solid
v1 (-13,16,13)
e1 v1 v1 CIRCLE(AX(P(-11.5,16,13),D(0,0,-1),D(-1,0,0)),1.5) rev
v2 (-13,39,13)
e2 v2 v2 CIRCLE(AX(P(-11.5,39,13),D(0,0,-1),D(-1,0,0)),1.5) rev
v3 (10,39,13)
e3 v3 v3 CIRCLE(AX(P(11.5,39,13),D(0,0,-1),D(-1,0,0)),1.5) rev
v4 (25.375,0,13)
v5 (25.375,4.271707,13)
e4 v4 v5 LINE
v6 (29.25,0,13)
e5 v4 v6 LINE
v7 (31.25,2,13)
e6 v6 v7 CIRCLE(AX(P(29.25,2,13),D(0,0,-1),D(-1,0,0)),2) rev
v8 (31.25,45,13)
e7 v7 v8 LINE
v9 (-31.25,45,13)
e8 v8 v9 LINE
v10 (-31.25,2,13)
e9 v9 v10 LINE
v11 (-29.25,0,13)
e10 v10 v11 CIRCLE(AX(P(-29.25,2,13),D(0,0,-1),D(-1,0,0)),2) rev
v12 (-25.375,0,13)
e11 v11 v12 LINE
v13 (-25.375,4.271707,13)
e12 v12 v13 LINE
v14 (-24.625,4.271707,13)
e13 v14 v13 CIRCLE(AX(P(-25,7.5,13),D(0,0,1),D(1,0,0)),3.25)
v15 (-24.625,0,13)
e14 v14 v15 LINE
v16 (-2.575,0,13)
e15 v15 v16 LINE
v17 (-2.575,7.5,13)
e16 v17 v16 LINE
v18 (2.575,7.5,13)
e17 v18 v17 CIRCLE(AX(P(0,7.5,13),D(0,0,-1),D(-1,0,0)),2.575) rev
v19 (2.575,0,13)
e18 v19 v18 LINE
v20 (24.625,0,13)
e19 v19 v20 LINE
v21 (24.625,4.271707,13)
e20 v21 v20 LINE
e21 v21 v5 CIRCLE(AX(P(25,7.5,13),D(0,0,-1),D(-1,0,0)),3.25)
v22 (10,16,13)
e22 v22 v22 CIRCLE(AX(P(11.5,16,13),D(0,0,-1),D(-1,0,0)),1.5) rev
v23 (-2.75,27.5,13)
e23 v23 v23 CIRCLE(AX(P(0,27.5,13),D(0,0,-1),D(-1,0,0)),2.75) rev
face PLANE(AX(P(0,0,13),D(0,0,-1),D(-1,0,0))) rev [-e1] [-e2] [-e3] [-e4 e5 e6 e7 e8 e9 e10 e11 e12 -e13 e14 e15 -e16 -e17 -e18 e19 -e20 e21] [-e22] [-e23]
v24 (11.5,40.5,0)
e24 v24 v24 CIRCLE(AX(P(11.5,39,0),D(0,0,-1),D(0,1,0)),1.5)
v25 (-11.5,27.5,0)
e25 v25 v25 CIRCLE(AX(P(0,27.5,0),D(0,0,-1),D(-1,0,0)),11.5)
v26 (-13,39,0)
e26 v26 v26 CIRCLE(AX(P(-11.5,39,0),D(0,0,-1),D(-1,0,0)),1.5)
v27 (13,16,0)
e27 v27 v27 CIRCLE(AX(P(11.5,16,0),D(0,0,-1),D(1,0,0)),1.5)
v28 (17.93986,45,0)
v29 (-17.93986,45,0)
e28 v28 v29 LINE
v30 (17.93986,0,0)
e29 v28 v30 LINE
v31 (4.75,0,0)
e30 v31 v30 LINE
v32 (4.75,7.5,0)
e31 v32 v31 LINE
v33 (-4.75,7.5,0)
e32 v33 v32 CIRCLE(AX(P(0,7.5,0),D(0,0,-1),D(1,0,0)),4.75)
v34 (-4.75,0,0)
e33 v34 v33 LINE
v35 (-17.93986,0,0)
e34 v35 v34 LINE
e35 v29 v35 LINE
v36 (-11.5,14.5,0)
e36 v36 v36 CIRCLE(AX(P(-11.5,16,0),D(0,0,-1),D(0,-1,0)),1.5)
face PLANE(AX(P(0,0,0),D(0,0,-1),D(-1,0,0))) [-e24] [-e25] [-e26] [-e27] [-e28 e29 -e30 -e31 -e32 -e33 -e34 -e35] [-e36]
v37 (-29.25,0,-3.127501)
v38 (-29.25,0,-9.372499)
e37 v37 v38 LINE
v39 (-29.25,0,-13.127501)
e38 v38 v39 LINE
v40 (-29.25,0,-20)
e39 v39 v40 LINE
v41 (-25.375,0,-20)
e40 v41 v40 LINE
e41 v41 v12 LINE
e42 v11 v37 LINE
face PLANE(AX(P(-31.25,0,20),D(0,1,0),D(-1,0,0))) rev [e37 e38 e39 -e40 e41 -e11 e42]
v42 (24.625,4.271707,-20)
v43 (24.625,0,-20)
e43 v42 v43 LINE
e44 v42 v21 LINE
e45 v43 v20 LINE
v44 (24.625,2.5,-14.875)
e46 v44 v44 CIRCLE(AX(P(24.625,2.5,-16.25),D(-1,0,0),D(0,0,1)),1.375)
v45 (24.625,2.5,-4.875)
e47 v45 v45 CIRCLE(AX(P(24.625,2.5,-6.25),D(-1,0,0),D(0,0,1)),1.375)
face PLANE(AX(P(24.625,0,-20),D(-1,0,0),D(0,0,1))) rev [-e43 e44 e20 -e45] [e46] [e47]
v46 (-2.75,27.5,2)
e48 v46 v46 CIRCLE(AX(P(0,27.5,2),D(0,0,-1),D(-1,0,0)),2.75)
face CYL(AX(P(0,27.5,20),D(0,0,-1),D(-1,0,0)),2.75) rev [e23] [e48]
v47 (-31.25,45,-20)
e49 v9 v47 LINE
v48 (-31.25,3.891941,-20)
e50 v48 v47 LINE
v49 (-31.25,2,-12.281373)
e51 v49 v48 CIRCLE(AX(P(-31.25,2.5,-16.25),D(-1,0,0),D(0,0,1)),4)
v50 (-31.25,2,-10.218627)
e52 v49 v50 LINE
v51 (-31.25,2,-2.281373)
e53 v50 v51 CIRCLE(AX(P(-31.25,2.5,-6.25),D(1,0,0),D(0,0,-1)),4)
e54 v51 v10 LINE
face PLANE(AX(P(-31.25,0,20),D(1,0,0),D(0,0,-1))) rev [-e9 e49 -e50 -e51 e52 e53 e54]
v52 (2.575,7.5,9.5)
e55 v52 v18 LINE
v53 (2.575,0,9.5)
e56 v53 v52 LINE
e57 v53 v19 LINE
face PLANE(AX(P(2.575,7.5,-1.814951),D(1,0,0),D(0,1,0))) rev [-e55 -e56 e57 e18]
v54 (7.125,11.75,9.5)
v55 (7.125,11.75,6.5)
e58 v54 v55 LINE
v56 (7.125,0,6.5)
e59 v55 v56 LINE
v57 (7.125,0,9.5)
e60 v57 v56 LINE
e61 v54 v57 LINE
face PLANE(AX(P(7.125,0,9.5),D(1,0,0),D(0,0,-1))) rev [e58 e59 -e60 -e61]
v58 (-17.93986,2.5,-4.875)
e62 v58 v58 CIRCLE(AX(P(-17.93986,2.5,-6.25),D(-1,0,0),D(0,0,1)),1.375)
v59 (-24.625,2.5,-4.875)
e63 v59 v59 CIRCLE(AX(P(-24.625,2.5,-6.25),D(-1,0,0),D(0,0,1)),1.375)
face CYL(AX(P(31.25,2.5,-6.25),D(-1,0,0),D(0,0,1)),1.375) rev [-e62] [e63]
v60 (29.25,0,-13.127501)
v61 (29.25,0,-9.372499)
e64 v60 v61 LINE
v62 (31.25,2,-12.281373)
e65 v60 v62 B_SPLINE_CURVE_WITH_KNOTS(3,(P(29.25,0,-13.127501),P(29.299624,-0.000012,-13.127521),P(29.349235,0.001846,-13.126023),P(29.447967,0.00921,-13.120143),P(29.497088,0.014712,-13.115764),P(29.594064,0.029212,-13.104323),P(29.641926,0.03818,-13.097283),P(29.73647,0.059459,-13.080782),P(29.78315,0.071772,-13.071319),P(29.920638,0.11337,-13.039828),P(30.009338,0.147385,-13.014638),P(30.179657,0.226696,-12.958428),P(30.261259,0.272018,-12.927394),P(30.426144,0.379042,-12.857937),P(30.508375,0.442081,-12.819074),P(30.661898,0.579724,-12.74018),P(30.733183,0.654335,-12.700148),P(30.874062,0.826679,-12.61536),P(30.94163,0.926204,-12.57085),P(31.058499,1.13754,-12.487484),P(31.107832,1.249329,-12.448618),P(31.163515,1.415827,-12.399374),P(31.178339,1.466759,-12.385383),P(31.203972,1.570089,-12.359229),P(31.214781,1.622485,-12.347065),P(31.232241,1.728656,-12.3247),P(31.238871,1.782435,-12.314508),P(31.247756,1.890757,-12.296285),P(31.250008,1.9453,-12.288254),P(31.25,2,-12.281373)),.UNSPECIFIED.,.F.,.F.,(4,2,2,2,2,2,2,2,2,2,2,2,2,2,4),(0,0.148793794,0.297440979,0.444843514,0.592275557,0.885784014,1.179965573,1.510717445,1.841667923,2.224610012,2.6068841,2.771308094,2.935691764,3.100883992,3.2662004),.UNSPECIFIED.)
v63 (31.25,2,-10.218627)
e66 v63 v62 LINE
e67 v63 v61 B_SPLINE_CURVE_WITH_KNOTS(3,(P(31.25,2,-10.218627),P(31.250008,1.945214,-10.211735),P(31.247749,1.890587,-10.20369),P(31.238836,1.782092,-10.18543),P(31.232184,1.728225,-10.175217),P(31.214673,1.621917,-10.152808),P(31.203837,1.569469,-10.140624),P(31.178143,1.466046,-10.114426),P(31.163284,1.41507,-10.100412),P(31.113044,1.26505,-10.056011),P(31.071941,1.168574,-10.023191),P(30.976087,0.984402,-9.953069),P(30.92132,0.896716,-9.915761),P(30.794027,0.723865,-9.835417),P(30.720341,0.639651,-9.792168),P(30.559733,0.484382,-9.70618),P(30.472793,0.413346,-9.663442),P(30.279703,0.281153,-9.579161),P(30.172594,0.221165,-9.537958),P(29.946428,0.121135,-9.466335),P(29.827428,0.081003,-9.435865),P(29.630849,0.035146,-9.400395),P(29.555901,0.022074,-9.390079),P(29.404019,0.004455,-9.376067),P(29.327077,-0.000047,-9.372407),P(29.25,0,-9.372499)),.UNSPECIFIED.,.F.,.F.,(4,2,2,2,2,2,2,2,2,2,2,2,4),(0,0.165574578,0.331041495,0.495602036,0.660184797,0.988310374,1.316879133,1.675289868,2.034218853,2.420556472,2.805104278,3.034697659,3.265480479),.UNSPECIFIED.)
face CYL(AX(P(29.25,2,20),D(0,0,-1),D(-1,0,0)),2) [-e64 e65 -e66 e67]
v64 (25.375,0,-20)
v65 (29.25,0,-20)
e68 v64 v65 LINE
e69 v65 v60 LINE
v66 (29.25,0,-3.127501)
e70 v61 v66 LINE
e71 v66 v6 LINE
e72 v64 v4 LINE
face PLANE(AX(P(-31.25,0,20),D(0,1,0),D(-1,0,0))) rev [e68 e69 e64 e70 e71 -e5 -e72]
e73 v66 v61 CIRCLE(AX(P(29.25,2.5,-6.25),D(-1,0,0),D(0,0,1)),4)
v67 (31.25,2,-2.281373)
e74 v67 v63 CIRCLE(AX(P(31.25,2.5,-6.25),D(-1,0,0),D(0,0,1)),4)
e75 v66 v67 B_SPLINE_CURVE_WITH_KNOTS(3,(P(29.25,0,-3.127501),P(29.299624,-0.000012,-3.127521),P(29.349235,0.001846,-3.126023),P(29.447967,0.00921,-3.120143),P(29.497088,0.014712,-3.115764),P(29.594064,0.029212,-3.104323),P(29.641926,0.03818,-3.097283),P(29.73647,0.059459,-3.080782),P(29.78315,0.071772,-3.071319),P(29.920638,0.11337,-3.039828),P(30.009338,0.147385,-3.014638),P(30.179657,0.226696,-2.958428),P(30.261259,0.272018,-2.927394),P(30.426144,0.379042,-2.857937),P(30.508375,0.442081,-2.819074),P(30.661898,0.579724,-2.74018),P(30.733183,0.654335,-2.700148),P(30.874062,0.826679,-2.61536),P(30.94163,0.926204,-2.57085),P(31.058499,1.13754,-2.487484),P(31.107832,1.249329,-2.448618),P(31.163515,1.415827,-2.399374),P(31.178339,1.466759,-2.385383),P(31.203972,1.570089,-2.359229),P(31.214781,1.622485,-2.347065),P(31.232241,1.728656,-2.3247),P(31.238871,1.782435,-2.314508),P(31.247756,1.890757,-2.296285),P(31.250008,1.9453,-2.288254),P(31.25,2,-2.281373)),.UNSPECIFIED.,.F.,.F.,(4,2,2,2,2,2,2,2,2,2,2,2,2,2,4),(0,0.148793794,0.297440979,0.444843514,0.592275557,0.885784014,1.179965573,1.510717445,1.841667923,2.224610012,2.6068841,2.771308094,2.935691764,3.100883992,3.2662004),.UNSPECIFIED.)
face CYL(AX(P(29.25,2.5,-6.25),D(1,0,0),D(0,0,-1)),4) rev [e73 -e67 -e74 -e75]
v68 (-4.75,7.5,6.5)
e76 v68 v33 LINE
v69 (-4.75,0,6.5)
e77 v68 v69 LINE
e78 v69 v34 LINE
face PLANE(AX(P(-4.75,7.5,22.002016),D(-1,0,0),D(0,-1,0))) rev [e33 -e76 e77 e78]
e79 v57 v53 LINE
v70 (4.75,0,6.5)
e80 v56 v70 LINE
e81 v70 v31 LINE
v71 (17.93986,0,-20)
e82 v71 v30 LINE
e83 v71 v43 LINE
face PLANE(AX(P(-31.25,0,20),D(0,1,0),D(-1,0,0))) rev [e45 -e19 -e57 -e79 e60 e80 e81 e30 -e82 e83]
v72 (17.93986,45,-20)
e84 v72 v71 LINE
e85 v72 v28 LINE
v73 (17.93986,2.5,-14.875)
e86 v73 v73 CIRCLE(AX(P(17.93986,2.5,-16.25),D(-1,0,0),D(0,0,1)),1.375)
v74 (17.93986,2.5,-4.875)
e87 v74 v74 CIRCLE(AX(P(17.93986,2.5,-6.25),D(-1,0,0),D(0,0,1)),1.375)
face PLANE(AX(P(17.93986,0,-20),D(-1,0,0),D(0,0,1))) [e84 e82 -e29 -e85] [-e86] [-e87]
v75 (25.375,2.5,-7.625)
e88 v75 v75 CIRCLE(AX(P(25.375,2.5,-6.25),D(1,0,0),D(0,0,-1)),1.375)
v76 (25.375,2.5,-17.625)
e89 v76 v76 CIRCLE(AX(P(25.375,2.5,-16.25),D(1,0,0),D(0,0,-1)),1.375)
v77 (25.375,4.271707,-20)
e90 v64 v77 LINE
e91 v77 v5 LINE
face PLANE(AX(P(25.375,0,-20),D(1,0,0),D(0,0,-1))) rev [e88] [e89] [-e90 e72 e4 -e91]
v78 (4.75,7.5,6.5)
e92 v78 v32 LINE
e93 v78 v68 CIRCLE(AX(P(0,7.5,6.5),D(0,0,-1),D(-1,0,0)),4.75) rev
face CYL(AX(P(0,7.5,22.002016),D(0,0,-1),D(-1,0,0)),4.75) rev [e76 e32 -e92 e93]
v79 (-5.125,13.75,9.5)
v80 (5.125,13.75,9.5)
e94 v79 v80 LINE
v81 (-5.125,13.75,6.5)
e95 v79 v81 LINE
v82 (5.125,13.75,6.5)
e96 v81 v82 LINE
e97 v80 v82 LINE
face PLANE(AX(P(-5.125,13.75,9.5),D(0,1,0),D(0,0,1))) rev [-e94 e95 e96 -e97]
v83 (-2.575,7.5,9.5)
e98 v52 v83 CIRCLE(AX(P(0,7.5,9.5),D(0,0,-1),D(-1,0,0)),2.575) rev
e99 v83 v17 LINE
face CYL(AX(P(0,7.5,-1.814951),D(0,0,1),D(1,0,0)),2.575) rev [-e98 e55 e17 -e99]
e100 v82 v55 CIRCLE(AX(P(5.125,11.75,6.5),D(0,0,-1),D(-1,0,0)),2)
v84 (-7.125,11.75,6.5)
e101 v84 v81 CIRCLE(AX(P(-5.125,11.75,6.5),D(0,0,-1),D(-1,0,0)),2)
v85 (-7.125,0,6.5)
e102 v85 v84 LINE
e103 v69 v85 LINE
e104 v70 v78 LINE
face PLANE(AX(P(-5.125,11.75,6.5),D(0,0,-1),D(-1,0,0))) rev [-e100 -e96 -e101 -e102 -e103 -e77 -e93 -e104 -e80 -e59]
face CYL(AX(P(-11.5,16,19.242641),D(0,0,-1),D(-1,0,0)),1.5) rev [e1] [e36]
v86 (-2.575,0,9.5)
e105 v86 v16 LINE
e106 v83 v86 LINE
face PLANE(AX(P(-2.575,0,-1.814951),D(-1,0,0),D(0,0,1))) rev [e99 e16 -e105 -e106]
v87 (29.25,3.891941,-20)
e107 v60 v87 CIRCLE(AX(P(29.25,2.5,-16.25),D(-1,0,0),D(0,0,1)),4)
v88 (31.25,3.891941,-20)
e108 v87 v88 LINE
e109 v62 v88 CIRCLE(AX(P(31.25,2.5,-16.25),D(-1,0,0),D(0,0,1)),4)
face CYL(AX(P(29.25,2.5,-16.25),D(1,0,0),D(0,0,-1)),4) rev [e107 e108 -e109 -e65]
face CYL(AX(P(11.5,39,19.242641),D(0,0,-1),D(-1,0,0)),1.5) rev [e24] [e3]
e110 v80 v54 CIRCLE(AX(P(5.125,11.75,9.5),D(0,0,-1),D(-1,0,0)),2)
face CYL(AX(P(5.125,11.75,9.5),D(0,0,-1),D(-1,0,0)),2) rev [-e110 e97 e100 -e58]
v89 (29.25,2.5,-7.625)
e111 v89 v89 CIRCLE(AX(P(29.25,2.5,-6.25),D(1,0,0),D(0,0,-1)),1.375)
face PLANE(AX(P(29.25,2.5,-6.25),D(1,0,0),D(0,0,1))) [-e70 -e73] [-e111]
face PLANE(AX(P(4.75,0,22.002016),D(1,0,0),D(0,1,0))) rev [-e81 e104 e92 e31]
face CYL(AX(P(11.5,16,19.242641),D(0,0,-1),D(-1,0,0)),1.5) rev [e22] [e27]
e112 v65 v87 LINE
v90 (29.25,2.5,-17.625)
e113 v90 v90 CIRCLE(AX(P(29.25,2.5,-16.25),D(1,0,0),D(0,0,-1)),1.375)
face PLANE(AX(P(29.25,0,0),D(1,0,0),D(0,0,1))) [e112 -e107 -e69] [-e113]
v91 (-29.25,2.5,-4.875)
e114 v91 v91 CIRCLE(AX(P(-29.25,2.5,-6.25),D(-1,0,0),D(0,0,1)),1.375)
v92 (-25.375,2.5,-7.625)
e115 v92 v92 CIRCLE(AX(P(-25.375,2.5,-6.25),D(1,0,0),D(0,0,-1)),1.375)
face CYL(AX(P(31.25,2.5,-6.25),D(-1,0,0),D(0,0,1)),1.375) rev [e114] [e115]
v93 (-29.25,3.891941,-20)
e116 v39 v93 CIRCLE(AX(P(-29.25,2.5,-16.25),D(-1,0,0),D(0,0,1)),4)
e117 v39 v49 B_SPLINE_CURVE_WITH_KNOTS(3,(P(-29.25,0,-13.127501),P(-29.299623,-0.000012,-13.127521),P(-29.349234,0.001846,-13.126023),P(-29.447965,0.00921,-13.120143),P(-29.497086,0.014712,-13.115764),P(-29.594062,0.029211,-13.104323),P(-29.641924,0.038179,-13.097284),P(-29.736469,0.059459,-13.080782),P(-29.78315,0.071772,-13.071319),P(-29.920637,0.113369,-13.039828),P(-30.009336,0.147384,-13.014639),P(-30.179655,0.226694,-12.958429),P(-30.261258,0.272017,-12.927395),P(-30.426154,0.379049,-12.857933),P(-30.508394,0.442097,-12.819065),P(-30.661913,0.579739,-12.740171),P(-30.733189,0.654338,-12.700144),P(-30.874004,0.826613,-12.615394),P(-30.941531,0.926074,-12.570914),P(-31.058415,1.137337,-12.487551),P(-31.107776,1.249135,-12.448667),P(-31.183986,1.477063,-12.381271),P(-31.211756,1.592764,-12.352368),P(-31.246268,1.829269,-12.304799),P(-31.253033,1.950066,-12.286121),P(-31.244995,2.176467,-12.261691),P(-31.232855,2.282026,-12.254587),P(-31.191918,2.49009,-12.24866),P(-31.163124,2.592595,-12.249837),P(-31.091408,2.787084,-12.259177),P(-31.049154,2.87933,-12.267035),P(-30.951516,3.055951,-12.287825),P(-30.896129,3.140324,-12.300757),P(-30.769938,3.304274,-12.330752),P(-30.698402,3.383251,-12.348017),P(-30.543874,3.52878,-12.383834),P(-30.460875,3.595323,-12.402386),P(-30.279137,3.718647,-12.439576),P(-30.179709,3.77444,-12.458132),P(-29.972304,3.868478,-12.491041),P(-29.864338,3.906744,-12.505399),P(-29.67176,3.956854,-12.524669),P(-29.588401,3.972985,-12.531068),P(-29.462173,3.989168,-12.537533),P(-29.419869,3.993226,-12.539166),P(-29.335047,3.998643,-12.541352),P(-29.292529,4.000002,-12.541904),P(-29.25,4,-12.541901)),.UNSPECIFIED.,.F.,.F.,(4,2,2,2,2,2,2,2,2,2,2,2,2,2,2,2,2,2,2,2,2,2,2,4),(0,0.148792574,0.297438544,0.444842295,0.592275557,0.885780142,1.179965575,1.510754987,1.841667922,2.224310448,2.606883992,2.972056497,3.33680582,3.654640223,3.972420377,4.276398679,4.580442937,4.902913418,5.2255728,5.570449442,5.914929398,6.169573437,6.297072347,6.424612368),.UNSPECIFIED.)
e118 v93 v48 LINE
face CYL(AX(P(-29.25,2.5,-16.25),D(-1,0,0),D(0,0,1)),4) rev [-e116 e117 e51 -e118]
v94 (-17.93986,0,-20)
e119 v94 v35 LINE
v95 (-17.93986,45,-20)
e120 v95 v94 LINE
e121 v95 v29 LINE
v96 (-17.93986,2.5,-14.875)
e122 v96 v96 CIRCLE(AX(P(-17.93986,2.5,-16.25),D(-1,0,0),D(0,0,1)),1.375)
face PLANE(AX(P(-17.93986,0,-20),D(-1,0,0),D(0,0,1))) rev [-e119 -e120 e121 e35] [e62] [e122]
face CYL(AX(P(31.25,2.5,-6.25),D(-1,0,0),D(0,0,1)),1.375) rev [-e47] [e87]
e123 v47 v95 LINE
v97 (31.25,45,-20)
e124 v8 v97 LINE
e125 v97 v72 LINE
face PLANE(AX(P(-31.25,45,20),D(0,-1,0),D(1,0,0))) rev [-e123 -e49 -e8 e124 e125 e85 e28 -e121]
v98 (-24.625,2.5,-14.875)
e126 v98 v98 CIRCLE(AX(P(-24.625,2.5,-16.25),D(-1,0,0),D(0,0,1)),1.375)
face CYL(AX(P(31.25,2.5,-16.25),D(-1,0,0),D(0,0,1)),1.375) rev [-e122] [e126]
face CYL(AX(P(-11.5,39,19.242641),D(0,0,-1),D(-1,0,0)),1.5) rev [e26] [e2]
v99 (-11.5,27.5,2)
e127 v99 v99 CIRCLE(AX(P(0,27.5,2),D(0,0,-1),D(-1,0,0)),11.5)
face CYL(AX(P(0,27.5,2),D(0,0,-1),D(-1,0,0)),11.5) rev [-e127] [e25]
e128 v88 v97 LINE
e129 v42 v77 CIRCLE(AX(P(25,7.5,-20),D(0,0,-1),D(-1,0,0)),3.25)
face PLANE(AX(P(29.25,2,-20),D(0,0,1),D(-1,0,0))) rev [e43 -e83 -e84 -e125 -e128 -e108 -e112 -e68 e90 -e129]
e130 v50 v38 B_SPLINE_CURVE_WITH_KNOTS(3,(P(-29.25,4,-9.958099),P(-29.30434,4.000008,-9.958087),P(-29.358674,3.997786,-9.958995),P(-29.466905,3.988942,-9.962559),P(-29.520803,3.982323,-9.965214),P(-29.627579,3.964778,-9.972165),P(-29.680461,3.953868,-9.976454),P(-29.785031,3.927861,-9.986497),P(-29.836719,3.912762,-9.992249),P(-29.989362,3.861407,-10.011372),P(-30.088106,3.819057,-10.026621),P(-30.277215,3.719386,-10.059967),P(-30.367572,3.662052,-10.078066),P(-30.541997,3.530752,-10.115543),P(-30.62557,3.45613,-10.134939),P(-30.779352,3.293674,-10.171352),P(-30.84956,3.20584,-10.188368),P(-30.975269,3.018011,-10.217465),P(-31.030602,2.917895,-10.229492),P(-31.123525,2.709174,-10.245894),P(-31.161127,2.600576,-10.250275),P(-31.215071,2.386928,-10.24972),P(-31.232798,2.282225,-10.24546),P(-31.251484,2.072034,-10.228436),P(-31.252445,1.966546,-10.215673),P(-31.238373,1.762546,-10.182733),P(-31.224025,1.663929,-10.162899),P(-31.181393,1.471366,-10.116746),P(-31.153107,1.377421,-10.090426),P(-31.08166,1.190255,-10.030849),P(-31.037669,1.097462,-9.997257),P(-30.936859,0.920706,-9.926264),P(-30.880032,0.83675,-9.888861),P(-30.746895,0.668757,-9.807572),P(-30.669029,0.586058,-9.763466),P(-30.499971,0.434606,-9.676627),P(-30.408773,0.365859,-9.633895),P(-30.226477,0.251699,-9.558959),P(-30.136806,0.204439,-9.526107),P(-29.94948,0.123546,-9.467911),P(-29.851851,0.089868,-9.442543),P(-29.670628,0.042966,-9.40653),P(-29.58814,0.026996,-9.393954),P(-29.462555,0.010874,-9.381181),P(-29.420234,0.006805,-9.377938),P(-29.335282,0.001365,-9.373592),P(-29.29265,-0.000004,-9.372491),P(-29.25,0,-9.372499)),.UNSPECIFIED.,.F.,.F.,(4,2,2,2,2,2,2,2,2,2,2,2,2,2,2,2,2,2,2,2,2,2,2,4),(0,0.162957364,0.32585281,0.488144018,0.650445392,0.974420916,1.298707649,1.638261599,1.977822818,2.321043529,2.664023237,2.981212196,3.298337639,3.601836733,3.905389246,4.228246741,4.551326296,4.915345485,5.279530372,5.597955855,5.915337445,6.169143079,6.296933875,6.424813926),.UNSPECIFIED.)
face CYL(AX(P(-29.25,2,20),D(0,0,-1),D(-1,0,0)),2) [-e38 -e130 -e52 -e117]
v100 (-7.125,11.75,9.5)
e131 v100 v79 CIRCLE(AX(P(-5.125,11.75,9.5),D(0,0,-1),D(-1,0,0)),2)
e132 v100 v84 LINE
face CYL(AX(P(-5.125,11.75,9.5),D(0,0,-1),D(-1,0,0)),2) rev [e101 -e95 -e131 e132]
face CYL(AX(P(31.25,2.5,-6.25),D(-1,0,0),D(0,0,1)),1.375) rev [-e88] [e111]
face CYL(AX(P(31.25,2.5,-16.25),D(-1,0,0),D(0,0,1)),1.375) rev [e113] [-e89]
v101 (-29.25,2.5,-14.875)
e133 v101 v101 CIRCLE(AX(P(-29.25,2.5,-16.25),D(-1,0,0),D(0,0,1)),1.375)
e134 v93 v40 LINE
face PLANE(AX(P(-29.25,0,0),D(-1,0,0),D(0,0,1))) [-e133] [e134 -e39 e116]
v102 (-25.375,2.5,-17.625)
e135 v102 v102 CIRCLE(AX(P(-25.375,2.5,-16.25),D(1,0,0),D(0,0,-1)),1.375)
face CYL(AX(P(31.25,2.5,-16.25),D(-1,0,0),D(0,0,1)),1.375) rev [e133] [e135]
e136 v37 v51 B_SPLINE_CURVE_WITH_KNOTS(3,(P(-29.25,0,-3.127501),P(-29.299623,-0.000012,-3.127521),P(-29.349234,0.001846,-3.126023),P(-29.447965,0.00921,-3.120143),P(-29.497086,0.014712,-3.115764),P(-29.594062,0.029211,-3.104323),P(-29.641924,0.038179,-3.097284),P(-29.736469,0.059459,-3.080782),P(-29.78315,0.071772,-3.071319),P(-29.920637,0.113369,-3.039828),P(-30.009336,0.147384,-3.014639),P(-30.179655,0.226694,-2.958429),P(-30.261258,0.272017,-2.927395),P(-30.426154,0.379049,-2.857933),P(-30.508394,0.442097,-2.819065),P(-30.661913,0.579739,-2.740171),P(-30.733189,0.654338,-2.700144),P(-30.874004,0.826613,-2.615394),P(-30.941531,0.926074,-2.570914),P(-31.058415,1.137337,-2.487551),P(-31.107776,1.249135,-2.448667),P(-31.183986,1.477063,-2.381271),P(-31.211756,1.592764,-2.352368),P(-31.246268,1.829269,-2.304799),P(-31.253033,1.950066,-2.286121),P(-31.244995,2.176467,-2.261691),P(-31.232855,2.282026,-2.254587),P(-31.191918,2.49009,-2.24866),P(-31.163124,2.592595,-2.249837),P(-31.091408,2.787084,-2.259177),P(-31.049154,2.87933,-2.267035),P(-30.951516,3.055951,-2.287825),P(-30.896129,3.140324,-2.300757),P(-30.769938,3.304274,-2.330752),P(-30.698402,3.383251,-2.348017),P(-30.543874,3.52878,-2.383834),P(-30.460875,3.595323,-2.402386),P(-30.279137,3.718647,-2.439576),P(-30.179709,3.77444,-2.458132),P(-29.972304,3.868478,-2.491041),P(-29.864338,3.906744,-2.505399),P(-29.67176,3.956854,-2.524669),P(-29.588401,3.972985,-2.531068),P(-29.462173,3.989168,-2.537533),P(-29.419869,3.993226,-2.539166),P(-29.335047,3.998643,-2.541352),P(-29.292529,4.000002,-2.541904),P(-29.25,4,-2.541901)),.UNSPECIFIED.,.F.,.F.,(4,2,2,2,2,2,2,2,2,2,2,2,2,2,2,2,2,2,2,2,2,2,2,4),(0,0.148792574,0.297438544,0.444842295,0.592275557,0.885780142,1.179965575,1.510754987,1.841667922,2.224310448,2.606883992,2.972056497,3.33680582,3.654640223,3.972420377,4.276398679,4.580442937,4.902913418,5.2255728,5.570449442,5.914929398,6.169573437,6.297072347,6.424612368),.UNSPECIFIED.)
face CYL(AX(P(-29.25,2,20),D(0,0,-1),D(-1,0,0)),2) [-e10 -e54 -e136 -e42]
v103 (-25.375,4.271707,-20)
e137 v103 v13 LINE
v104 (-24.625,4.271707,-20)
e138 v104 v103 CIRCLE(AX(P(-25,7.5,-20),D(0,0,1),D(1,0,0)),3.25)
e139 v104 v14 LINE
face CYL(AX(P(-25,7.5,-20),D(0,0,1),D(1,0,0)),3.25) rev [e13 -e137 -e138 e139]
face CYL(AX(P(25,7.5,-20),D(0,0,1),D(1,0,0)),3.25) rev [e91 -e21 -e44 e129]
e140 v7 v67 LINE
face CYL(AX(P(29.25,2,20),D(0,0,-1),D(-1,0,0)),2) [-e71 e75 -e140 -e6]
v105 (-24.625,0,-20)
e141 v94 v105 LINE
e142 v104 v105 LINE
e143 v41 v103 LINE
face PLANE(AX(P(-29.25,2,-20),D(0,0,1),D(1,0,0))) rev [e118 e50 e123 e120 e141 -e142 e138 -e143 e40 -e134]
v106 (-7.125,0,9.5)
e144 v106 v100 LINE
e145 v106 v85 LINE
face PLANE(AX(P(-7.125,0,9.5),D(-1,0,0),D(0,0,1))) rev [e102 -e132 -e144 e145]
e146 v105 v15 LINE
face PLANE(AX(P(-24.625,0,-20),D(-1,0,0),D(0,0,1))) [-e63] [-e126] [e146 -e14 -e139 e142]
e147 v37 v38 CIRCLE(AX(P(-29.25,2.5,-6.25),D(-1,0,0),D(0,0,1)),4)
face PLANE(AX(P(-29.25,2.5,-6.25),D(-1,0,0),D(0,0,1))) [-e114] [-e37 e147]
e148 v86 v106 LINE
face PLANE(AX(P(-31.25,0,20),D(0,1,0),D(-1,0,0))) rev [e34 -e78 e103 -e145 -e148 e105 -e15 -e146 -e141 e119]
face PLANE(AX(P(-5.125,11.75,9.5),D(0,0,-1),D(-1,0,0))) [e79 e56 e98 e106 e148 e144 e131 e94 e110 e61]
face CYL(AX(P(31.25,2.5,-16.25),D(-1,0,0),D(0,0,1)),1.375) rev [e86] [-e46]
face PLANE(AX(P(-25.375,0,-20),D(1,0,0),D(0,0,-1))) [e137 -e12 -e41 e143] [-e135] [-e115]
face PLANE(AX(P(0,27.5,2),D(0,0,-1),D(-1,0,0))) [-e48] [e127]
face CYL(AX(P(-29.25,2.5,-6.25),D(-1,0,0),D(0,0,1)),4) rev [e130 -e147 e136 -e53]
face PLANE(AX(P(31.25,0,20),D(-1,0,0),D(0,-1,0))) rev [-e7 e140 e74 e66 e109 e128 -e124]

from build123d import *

# Parameters (mm, degrees)
SKETCH1_W           = 62.5
SKETCH1_H           = 45
BOSS_EXTRUDE1_DEPTH = 20
SKETCH2_W           = 37.5
SKETCH2_H           = 45
CUT_EXTRUDE1_DEPTH  = 5
SKETCH3_R           = 11.5
CUT_EXTRUDE2_DEPTH  = 2
SKETCH4_R           = 1.5
CUT_EXTRUDE3_DEPTH  = 15
CIRPATTERN1_COUNT   = 4
SKETCH5_R           = 2.75
CUT_EXTRUDE4_DEPTH  = 58.66769
CUT_EXTRUDE7_START  = -6.5
CUT_EXTRUDE7_DEPTH  = 3
CUT_EXTRUDE8_DEPTH  = 6.5
CUT_EXTRUDE9_DEPTH  = 5.5
SKETCH11_R          = 1.375
CUT_EXTRUDE10_DEPTH = 80.569152
FILLET1_R           = 2
SKETCH12_R          = 3.625
CUT_EXTRUDE12_DEPTH = 3
BOSS_EXTRUDE2_START = 20
BOSS_EXTRUDE2_DEPTH = 20
SKETCH14_R          = 4
CUT_EXTRUDE18_DEPTH = 2
SKETCH15_W          = 62.5
SKETCH15_H          = 45
CUT_EXTRUDE19_DEPTH = 7
SKETCH16_R          = 3.25
CUT_EXTRUDE20_DEPTH = 64.957506
SKETCH17_R          = 1.375
CUT_EXTRUDE21_DEPTH = 79.008013


with BuildPart() as part:
    # Sketch1 → Boss-Extrude1 (new body)
    with BuildSketch(Plane.XY):
        with Locations((0, 22.5)):
            Rectangle(SKETCH1_W, SKETCH1_H)
    extrude(amount=BOSS_EXTRUDE1_DEPTH)

    # Sketch2 → Cut-Extrude1 (cut)
    with BuildSketch(Plane.XY.offset(20)):
        with Locations((0, 22.5)):
            Rectangle(SKETCH2_W, SKETCH2_H)
    extrude(amount=-CUT_EXTRUDE1_DEPTH, mode=Mode.SUBTRACT)

    # Sketch3 → Cut-Extrude2 (cut)
    with BuildSketch(Plane(origin=(0, 0, 0), x_dir=(-1, 0, 0), z_dir=(0, 0, -1))):
        with Locations((0, 27.5)):
            Circle(SKETCH3_R)
    extrude(amount=-CUT_EXTRUDE2_DEPTH, mode=Mode.SUBTRACT)

    # Sketch4 → Cut-Extrude3 (cut)
    with BuildSketch(Plane(origin=(0, 0, 0), x_dir=(-1, 0, 0), z_dir=(0, 0, -1))):
        with Locations((11.5, 39)):
            Circle(SKETCH4_R)
    cut_extrude3 = extrude(amount=-CUT_EXTRUDE3_DEPTH, mode=Mode.SUBTRACT)

    # CirPattern1: Cut-Extrude3 ×4 about axis
    cirpattern1_axis = Axis((0, 27.5, 0), (0, 0, 1))
    for i in range(1, CIRPATTERN1_COUNT):
        add(cut_extrude3.rotate(cirpattern1_axis, i * 360 / CIRPATTERN1_COUNT), mode=Mode.SUBTRACT)

    # Sketch5 → Cut-Extrude4 (cut, through all)
    with BuildSketch(Plane(origin=(0, 0, 2), x_dir=(-1, 0, 0), z_dir=(0, 0, -1))):
        with Locations((0, 27.5)):
            Circle(SKETCH5_R)
    extrude(amount=-CUT_EXTRUDE4_DEPTH, mode=Mode.SUBTRACT)

    # Sketch8 → Cut-Extrude7 (cut)
    with BuildSketch(Plane(origin=(0, 0, 0), x_dir=(-1, 0, 0), z_dir=(0, 0, -1)).offset(CUT_EXTRUDE7_START)):
        with BuildLine():
            Line((7.125, 0), (-7.125, 0))
            Line((-7.125, 0), (-7.125, 11.75))
            ThreePointArc((-7.125, 11.75), (-6.539214, 13.164214), (-5.125, 13.75))
            Line((-5.125, 13.75), (5.125, 13.75))
            ThreePointArc((5.125, 13.75), (6.539214, 13.164214), (7.125, 11.75))
            Line((7.125, 11.75), (7.125, 0))
        make_face()
    extrude(amount=-CUT_EXTRUDE7_DEPTH, mode=Mode.SUBTRACT)

    # Sketch9 → Cut-Extrude8 (cut)
    with BuildSketch(Plane(origin=(0, 0, 0), x_dir=(-1, 0, 0), z_dir=(0, 0, -1))):
        with BuildLine():
            Line((4.75, 7.5), (4.75, 0))
            Line((4.75, 0), (-4.75, 0))
            Line((-4.75, 0), (-4.75, 7.5))
            ThreePointArc((-4.75, 7.5), (0, 12.25), (4.75, 7.5))
        make_face()
    extrude(amount=-CUT_EXTRUDE8_DEPTH, mode=Mode.SUBTRACT)

    # Sketch10 → Cut-Extrude9 (cut)
    with BuildSketch(Plane.XY.offset(15)):
        with BuildLine():
            Line((2.575, 7.5), (2.575, 0))
            Line((2.575, 0), (-2.575, 0))
            Line((-2.575, 0), (-2.575, 7.5))
            ThreePointArc((-2.575, 7.5), (0, 10.075), (2.575, 7.5))
        make_face()
    extrude(amount=-CUT_EXTRUDE9_DEPTH, mode=Mode.SUBTRACT)

    # Sketch11 → Cut-Extrude10 (cut, through all)
    with BuildSketch(Plane(origin=(31.25, 0, 0), x_dir=(0, 0, -1), z_dir=(1, 0, 0))):
        with Locations(Location((-17.5, 2.5, 0), (0, 0, 90))):
            Circle(SKETCH11_R)
    extrude(amount=-CUT_EXTRUDE10_DEPTH, mode=Mode.SUBTRACT)

    # Fillet1
    # the kernel refuses this fillet: 2 mm, written as the material it takes off along each edge
    with BuildSketch(Plane(origin=(31.25, 0, -5), x_dir=(0, 1, 0), z_dir=(0, 0, 1)), Plane(origin=(-31.25, 0, -5), x_dir=(1, 0, 0), z_dir=(0, 0, 1))) as fillet1_piece_1:
        with BuildLine():
            CenterArc((FILLET1_R, FILLET1_R), FILLET1_R, 180, 90)
            Line((0, FILLET1_R), (0, 0))
            Line((0, 0), (FILLET1_R, 0))
        make_face()
    extrude(amount=30, mode=Mode.SUBTRACT)

    # Sketch12 → Cut-Extrude12 (cut)
    with BuildSketch(Plane(origin=(31.25, 0, 0), x_dir=(0, 0, -1), z_dir=(1, 0, 0))):
        with Locations((-17.5, 2.5)):
            Circle(SKETCH12_R)
    cut_extrude12 = extrude(amount=-CUT_EXTRUDE12_DEPTH, mode=Mode.SUBTRACT)

    # Mirror3: Cut-Extrude12 across plane
    add(cut_extrude12.mirror(Plane(origin=(0, 0, 0), x_dir=(0, 0, 1), z_dir=(1, 0, 0))), mode=Mode.SUBTRACT)

    # Sketch13 → Boss-Extrude2 (add)
    with BuildSketch(Plane(origin=(0, 0, 0), x_dir=(-1, 0, 0), z_dir=(0, 0, -1)).offset(BOSS_EXTRUDE2_START)):
        with BuildLine():
            Line((17.93986, 0), (29.25, 0))
            ThreePointArc((29.25, 0), (30.664214, 0.585786), (31.25, 2))
            Line((31.25, 2), (31.25, 45))
            Line((31.25, 45), (17.93986, 45))
            Line((17.93986, 45), (17.93986, 0))
        make_face()
    boss_extrude2 = extrude(amount=-BOSS_EXTRUDE2_DEPTH)

    # Sketch14 → Cut-Extrude18 (cut)
    with BuildSketch(Plane.ZY.offset(31.25)):
        with BuildLine():
            ThreePointArc((-20, 3.891941), (-20.187004, 3.207107), (-20.25, 2.5))
            ThreePointArc((-20.25, 2.5), (-19.588022, 0.296002), (-17.821195, -1.178498))
            ThreePointArc((-17.821195, -1.178498), (-14.259364, -0.969491), (-12.281373, 2))
            Line((-12.281373, 2), (-20, 2))
            Line((-20, 2), (-20, 3.891941))
        make_face()
        with BuildLine():
            ThreePointArc((-12.25, 2.5), (-15.542893, 6.437004), (-20, 3.891941))
            Line((-20, 3.891941), (-20, 2))
            Line((-20, 2), (-12.281373, 2))
            ThreePointArc((-12.281373, 2), (-12.257851, 2.249508), (-12.25, 2.5))
        make_face()
        with BuildLine():
            ThreePointArc((-17.821195, -1.178498), (-19.588022, 0.296002), (-20.25, 2.5))
            Line((-20.25, 2.5), (-20.25, -1.178498))
            Line((-20.25, -1.178498), (-17.821195, -1.178498))
        make_face()
        with Locations((-6.25, 2.5)):
            Circle(SKETCH14_R)
    cut_extrude18 = extrude(amount=-CUT_EXTRUDE18_DEPTH, mode=Mode.SUBTRACT)

    # Sketch15 → Cut-Extrude19 (cut)
    with BuildSketch(Plane.XY.offset(20)):
        with Locations((0, 22.5)):
            Rectangle(SKETCH15_W, SKETCH15_H)
    extrude(amount=-CUT_EXTRUDE19_DEPTH, mode=Mode.SUBTRACT)

    # Sketch16 → Cut-Extrude20 (cut, through all)
    with BuildSketch(Plane.XY.offset(13)):
        with BuildLine():
            Line((-24.625, 0), (-24.625, 4.271707))
            ThreePointArc((-24.625, 4.271707), (-25, 4.25), (-25.375, 4.271707))
            Line((-25.375, 4.271707), (-25.375, 0))
            Line((-25.375, 0), (-24.625, 0))
        make_face()
        with Locations((-25, 7.5)):
            Circle(SKETCH16_R)
    cut_extrude20 = extrude(amount=-CUT_EXTRUDE20_DEPTH, mode=Mode.SUBTRACT)

    # Mirror4: Boss-Extrude2, Cut-Extrude18, Cut-Extrude20 across plane
    add(boss_extrude2.mirror(Plane(origin=(0, 0, 0), x_dir=(0, 0, 1), z_dir=(1, 0, 0))))
    add(cut_extrude18.mirror(Plane(origin=(0, 0, 0), x_dir=(0, 0, 1), z_dir=(1, 0, 0))), mode=Mode.SUBTRACT)
    add(cut_extrude20.mirror(Plane(origin=(0, 0, 0), x_dir=(0, 0, 1), z_dir=(1, 0, 0))), mode=Mode.SUBTRACT)

    # Sketch17 → Cut-Extrude21 (cut, through all)
    with BuildSketch(Plane.ZY.offset(29.25)):
        with Locations(Location((-6.25, 2.5, 0), (0, 0, 180))):
            Circle(SKETCH17_R)
        with Locations(Location((-16.25, 2.5, 0), (0, 0, 180))):
            Circle(SKETCH17_R)
    extrude(amount=-CUT_EXTRUDE21_DEPTH, mode=Mode.SUBTRACT)


solid = part.part
